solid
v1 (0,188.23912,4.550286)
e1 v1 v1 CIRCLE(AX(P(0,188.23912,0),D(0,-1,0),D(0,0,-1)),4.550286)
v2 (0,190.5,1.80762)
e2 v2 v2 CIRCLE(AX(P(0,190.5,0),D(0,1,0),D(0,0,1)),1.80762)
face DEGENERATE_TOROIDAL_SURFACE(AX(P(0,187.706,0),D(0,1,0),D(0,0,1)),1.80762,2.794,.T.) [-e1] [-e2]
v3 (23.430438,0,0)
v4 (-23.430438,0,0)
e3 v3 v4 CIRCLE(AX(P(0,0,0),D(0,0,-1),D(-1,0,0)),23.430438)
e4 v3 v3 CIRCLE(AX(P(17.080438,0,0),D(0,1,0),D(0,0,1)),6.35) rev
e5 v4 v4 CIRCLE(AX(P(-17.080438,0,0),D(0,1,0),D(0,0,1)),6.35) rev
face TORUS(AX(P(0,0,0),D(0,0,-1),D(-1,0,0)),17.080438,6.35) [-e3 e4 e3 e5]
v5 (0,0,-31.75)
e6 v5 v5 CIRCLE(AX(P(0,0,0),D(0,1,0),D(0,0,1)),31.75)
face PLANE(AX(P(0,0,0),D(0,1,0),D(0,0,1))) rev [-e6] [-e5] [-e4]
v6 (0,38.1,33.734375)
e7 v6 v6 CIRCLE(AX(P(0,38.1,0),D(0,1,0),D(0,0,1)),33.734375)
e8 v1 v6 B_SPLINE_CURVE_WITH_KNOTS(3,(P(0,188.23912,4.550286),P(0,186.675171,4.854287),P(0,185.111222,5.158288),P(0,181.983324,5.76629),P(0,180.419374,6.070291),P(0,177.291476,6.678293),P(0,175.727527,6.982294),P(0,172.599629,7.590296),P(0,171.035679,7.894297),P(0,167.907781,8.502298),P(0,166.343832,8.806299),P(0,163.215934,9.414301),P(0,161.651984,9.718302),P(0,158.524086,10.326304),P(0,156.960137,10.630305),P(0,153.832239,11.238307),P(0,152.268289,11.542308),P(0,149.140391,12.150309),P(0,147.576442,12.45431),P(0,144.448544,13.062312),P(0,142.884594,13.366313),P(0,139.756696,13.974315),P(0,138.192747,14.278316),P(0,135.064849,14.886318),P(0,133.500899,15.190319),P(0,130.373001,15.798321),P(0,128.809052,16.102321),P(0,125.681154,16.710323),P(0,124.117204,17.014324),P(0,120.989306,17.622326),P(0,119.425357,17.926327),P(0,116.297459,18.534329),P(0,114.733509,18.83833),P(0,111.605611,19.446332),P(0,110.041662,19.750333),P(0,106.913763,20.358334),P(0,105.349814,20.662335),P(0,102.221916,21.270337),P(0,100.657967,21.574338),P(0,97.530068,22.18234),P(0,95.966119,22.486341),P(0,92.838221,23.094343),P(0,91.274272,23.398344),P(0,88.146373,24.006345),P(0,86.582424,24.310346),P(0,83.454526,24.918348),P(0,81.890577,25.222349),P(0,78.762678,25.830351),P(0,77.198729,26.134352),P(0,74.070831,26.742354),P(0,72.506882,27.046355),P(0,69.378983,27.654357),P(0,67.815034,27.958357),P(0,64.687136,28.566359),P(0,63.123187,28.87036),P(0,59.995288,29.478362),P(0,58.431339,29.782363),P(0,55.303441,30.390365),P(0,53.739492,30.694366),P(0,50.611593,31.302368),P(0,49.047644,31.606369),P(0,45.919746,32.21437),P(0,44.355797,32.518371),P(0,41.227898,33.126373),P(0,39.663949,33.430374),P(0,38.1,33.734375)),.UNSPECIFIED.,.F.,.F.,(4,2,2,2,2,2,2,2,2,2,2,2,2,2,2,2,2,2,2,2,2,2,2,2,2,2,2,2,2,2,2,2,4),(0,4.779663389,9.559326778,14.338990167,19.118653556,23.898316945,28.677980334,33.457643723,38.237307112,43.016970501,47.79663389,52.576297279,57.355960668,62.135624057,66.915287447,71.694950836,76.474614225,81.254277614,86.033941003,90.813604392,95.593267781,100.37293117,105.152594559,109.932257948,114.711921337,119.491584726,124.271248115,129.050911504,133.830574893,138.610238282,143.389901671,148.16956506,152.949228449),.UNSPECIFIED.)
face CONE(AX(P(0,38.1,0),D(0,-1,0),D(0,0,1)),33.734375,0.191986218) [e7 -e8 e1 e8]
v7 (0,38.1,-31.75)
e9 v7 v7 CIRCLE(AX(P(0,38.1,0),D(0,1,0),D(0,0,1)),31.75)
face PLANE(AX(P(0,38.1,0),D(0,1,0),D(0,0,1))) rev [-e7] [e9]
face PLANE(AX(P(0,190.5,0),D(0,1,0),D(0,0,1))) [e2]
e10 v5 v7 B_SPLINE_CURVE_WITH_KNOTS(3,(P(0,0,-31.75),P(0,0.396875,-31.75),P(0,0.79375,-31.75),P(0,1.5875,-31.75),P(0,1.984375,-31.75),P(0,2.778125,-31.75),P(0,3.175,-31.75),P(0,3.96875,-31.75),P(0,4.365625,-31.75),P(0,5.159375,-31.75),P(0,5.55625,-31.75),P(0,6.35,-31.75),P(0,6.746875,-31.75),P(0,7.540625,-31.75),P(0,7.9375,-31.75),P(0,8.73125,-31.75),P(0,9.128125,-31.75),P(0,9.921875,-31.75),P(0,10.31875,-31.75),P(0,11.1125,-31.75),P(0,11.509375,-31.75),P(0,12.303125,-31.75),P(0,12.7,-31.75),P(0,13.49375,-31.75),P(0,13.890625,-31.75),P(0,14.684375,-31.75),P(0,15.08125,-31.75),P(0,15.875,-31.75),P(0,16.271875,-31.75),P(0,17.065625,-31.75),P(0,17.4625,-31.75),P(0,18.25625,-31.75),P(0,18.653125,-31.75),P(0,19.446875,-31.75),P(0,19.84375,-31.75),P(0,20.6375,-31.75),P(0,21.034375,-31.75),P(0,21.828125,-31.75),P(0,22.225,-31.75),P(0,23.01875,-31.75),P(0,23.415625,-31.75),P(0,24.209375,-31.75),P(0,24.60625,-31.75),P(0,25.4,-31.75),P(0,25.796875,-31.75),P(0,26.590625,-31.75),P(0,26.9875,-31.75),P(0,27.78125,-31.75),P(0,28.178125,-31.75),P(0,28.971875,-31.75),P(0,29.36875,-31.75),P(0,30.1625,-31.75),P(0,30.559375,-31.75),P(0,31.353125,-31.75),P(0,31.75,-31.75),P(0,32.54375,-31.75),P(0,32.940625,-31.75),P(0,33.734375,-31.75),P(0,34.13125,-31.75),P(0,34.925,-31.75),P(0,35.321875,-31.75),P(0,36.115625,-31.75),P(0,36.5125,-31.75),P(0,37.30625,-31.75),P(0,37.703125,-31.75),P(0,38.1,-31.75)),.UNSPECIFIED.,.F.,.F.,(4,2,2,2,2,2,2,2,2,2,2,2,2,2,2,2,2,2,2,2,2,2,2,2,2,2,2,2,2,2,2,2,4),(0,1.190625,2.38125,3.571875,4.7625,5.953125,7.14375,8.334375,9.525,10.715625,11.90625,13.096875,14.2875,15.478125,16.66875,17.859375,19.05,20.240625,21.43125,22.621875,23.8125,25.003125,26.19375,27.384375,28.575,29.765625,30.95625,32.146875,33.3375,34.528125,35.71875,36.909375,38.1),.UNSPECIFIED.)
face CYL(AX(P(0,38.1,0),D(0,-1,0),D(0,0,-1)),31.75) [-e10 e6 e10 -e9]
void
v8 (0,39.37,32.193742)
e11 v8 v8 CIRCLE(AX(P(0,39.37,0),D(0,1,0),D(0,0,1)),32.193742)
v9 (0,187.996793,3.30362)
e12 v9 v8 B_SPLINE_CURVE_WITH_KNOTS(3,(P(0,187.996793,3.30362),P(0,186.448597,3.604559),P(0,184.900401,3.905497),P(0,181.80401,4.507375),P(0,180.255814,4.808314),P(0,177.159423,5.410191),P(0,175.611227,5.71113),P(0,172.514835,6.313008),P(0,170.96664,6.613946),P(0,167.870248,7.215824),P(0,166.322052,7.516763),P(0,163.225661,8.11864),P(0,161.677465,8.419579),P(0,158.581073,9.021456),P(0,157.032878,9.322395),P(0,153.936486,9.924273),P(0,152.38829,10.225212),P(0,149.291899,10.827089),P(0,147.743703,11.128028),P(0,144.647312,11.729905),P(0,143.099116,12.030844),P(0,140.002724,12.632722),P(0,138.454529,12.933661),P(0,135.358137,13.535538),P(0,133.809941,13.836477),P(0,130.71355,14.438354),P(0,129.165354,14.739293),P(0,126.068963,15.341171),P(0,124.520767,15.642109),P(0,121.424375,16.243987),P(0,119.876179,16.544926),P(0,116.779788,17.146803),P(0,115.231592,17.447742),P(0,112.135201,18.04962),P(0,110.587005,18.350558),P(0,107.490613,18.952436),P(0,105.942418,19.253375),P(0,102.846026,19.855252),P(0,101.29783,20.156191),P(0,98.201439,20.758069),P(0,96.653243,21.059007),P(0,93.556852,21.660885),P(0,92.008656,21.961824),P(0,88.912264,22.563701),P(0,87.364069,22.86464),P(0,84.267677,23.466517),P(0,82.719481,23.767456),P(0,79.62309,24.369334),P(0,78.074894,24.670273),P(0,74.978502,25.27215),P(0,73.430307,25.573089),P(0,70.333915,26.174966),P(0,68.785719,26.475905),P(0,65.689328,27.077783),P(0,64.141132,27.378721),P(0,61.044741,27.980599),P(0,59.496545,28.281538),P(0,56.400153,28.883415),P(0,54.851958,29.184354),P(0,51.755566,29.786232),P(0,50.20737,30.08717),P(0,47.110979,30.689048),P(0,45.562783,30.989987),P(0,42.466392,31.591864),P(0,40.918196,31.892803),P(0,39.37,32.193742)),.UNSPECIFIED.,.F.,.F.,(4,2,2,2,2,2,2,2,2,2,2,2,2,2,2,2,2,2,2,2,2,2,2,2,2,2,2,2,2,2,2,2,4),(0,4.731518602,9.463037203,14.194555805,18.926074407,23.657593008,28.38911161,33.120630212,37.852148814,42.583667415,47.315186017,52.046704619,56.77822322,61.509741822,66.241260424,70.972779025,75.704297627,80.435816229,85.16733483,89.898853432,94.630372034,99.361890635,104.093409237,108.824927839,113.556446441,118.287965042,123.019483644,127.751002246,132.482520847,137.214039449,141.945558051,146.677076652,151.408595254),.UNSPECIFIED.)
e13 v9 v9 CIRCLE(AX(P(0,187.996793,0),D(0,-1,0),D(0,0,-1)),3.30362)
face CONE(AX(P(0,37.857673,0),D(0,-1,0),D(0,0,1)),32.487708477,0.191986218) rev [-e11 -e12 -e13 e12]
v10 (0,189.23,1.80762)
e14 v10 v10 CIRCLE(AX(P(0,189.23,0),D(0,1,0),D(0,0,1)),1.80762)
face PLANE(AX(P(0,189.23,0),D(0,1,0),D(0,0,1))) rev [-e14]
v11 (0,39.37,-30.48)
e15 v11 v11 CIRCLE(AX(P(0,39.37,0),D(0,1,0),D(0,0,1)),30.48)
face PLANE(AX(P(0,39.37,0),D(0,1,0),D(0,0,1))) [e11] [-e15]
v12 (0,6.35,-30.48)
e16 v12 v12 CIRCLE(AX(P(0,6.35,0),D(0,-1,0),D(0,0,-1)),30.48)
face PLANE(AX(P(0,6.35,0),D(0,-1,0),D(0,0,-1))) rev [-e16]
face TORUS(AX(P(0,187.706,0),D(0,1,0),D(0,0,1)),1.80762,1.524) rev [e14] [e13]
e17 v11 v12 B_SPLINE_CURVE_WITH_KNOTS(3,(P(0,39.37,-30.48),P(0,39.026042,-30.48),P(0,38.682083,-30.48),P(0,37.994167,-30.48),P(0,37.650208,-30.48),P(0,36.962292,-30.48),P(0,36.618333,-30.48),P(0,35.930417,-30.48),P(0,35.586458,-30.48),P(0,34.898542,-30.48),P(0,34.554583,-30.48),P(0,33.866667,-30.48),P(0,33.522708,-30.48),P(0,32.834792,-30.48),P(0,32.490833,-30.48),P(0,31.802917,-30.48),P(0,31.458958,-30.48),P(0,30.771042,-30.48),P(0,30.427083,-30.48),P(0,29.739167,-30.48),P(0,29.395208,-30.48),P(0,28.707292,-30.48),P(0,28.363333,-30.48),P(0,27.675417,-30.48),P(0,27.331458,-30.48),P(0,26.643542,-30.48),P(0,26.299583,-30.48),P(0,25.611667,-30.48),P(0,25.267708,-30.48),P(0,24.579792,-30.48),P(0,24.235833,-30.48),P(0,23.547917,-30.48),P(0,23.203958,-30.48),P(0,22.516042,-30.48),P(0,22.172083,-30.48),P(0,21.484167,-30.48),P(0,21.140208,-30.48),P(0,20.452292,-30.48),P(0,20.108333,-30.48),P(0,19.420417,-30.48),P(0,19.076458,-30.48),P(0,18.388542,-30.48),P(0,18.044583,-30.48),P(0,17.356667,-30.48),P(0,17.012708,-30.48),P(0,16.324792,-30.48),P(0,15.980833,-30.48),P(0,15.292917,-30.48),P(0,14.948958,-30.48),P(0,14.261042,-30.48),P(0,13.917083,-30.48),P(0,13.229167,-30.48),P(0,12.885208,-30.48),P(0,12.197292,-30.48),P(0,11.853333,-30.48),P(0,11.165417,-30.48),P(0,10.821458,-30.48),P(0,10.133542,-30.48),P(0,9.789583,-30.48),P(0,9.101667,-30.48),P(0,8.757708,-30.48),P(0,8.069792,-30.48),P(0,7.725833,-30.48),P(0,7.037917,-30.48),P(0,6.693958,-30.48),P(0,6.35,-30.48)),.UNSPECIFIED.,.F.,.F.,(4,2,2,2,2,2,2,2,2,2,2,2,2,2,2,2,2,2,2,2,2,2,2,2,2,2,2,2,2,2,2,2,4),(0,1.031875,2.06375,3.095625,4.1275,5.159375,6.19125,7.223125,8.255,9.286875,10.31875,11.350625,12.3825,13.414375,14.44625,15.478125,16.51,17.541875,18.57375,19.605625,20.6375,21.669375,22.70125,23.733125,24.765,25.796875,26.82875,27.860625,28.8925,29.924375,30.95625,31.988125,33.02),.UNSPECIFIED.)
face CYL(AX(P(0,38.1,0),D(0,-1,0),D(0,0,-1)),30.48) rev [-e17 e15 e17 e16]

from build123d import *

# Parameters (mm, degrees)
SKETCH1_R           = 31.75
BOSS_EXTRUDE1_DEPTH = 38.1
SKETCH2_R           = 33.734375
BOSS_EXTRUDE2_DEPTH = 152.4
BOSS_EXTRUDE2_TAPER = 11
FILLET1_R           = 2.794
SKETCH4_R           = 6.35
REVOLVE1_ANGLE      = 180
SKETCH5_R           = 31.75
BOSS_EXTRUDE3_DEPTH = 6.35


# Read off the part's stored shape, not the designer's step: Shell3
with BuildPart() as part:
    # Sketch1 → Boss-Extrude1 (new body)
    with BuildSketch(Plane(origin=(0, 0, 0), x_dir=(1, 0, 0), z_dir=(0, 1, 0))):
        with Locations(Location((0, 0, 0), (0, 0, 90))):
            Circle(SKETCH1_R)
    extrude(amount=BOSS_EXTRUDE1_DEPTH)

    # Sketch2 → Boss-Extrude2 (add)
    with BuildSketch(Plane(origin=(0, 38.1, 0), x_dir=(1, 0, 0), z_dir=(0, 1, 0))):
        Circle(SKETCH2_R)
    extrude(amount=BOSS_EXTRUDE2_DEPTH, taper=BOSS_EXTRUDE2_TAPER)

    # Fillet1
    fillet1_edges = [part.edges().sort_by_distance(p)[0] for p in [
        (-4.110815887, 190.5, 0),
    ]]
    fillet(fillet1_edges, radius=FILLET1_R)

    # Shell3 outline → Shell3 (revolve, cut)
    with BuildSketch(Plane.XY):
        with BuildLine():
            Line((32.193741805, 39.37), (3.303619853, 187.996792909))
            ThreePointArc((3.303619853, 187.996792909), (2.777003233, 188.881955865), (1.807620025, 189.23))
            Line((1.807620025, 189.23), (0, 189.23))
            Line((0, 189.23), (0, 1.27))
            Line((0, 1.27), (30.48, 1.27))
            Line((30.48, 1.27), (30.48, 39.37))
            Line((30.48, 39.37), (32.193741805, 39.37))
        make_face()
    revolve(axis=Axis((0, 0, 0), (0, 1, 0)), mode=Mode.SUBTRACT)

    # Sketch4 → Revolve1 (revolve)
    with BuildSketch(Plane.XZ):
        with Locations((-17.08043758, 0)):
            Circle(SKETCH4_R)
    revolve(axis=Axis((0, 0, 0), (0, 0, 1)), revolution_arc=REVOLVE1_ANGLE)

    # Sketch5 → Boss-Extrude3 (add)
    with BuildSketch(Plane.XZ):
        with Locations(Location((0, 0, 0), (0, 0, 270))):
            Circle(SKETCH5_R)
    extrude(amount=-BOSS_EXTRUDE3_DEPTH)


solid = part.part
